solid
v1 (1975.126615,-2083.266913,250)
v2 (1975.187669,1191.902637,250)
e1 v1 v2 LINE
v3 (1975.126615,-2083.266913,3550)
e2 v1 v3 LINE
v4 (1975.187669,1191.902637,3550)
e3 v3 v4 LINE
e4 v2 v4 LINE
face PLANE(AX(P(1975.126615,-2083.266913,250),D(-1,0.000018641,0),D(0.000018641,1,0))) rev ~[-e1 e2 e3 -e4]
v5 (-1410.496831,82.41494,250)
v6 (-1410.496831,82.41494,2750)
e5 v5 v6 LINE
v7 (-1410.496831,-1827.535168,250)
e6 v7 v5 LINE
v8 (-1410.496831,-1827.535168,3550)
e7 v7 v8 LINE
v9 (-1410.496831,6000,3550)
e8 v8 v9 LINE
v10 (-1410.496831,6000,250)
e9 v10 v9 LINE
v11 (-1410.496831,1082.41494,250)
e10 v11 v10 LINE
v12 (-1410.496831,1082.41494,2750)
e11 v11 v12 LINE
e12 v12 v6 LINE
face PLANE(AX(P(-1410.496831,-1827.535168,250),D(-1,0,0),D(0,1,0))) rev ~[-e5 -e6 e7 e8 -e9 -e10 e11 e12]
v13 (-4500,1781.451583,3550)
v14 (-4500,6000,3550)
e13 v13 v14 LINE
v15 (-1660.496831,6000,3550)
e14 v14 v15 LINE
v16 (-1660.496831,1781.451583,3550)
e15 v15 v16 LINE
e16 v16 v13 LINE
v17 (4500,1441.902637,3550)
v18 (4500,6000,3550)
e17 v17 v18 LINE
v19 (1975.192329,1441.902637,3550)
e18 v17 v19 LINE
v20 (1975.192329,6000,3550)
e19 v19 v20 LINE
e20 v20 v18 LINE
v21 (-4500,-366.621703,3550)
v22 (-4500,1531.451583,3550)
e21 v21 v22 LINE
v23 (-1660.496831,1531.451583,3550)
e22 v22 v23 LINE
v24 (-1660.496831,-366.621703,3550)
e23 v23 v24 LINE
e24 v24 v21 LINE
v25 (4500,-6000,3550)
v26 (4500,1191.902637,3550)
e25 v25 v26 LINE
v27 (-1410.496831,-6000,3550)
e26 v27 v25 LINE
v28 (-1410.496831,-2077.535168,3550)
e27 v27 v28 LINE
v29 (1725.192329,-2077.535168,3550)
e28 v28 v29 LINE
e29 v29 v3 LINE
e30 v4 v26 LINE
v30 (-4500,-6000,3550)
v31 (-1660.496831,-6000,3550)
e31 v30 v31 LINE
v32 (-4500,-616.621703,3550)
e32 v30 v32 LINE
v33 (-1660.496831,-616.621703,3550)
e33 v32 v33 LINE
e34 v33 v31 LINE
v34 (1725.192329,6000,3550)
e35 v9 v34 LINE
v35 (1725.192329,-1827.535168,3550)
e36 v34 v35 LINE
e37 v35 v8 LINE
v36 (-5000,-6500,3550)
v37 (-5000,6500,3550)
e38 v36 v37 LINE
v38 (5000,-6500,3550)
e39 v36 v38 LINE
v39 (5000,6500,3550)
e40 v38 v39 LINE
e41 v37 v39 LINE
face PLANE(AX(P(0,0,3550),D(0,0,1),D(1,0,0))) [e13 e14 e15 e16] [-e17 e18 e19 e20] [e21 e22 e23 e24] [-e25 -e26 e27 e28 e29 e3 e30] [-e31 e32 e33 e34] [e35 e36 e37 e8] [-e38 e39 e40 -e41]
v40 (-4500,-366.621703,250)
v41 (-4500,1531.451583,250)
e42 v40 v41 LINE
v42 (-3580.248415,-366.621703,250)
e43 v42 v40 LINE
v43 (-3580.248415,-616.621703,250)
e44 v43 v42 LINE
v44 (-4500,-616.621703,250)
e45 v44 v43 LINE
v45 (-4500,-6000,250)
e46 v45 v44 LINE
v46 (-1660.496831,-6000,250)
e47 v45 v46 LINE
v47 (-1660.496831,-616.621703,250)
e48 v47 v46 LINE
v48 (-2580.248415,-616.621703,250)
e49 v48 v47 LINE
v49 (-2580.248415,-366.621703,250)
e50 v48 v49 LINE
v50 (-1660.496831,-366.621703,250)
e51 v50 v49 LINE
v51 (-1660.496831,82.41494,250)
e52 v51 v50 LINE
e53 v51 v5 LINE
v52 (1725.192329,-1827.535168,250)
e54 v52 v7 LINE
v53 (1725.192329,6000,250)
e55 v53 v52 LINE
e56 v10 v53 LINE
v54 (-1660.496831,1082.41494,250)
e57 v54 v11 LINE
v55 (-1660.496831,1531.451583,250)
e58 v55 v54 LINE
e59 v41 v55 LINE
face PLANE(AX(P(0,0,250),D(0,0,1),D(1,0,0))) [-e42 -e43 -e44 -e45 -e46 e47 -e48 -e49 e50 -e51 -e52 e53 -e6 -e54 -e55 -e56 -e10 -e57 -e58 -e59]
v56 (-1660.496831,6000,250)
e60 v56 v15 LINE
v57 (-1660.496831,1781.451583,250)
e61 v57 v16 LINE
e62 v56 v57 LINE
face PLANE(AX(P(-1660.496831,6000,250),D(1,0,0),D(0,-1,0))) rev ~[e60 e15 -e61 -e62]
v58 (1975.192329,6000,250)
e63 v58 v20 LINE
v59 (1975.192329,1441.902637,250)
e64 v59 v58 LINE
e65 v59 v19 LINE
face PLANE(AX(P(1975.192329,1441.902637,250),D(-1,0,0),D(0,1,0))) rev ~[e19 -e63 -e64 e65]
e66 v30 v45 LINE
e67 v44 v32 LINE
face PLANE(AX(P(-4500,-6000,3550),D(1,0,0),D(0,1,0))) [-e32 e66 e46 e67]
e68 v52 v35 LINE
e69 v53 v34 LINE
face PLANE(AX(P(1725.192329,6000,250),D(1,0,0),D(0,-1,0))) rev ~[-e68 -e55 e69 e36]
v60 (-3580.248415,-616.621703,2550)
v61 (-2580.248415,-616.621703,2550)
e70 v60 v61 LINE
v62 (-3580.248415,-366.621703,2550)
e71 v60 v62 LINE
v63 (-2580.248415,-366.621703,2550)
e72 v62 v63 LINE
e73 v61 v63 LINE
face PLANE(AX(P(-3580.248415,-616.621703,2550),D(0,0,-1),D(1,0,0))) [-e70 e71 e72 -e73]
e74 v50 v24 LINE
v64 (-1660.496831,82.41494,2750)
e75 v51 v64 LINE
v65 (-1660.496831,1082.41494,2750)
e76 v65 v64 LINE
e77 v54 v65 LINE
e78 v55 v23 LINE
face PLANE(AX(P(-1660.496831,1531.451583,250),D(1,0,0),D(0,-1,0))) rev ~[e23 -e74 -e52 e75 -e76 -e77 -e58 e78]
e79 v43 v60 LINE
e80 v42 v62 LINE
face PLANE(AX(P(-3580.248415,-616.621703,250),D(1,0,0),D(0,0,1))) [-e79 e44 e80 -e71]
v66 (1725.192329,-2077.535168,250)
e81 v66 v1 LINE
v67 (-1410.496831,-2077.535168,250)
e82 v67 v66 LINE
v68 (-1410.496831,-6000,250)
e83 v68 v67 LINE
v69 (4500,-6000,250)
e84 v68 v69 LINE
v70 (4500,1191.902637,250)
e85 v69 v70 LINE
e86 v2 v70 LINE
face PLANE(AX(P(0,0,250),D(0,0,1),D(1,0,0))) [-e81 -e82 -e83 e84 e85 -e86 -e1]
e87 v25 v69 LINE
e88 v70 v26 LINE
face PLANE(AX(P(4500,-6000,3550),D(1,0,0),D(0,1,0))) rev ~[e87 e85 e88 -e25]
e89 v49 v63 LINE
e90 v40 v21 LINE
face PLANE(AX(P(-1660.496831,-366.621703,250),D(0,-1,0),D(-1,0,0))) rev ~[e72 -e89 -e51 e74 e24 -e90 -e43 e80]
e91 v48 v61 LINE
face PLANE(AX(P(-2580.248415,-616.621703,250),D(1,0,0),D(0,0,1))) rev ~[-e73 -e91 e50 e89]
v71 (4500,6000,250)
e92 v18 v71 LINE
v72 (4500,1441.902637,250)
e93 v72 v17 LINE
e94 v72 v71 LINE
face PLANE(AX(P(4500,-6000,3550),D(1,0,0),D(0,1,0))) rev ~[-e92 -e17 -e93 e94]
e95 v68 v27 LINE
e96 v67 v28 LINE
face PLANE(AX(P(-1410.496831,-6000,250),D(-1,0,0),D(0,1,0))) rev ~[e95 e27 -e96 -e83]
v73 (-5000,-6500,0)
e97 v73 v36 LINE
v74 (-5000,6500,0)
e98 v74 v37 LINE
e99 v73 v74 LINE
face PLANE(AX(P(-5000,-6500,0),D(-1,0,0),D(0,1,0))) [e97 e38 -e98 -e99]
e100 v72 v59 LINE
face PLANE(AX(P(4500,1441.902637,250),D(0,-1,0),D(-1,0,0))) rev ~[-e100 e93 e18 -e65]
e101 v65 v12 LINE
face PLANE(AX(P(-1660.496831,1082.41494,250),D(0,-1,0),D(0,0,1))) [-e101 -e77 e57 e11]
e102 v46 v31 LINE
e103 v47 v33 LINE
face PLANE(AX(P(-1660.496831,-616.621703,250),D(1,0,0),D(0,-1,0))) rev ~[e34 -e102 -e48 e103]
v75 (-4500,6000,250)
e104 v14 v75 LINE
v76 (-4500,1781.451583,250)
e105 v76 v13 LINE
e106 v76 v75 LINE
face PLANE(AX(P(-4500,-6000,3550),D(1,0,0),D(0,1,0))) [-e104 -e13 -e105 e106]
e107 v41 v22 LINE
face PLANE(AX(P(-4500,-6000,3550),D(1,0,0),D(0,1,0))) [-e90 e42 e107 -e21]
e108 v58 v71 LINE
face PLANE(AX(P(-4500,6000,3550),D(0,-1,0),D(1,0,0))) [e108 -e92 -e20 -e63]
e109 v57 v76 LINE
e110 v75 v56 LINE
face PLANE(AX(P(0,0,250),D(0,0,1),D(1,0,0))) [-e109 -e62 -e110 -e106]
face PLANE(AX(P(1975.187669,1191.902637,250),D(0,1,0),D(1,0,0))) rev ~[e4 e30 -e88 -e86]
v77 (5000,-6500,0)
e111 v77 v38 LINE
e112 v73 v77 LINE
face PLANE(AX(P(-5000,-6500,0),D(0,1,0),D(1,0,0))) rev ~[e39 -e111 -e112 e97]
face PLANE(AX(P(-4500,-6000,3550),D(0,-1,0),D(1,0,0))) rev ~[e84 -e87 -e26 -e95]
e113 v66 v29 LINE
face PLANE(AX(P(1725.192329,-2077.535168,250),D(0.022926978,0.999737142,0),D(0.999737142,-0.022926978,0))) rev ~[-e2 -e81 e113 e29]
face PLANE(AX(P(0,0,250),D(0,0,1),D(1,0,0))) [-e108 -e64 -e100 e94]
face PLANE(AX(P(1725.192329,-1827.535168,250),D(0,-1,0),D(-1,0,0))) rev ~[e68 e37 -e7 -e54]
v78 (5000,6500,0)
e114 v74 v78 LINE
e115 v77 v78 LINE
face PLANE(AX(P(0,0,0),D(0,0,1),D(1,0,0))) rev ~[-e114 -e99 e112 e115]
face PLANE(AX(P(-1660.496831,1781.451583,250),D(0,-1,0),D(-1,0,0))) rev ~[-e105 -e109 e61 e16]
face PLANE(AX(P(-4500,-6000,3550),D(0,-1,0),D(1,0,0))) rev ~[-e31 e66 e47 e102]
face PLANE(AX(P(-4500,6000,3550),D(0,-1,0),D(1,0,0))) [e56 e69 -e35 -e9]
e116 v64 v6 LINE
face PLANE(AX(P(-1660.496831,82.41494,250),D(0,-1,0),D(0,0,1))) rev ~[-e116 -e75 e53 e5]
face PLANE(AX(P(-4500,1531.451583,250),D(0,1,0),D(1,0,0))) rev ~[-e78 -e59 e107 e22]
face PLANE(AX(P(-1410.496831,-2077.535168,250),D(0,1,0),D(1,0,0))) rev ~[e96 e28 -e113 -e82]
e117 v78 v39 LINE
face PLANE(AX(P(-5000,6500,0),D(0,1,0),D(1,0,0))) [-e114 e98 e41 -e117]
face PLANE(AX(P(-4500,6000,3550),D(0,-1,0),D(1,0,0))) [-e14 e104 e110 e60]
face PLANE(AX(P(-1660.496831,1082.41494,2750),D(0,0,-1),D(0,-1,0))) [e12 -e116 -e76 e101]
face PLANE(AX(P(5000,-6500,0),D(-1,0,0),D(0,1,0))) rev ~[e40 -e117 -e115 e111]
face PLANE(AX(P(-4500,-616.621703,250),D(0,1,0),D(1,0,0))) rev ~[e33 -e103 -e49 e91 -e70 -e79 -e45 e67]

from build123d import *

# Parameters (mm, degrees)
F0_W     = 10000
F0_H     = 13000
F1_DEPTH = 3550
F2_W     = 9000
F2_H     = 12000
F3_DEPTH = 3300
F5_DEPTH = 3300
F6_W     = 1000
F6_H     = 2300
F7_DEPTH = 250
F8_W     = 1000
F8_H     = 2500
F9_DEPTH = 250


# Not quite as in the source:
# - a feature names something its author has since deleted; it is built from what else it names


with BuildPart() as f1:
    # F0 (on Top) → F1 (new body)
    with BuildSketch(Plane.XY):
        Rectangle(F0_W, F0_H)
    extrude(amount=F1_DEPTH)

    # F2 (on face) → F3 (cut)
    with BuildSketch(Plane.XY.offset(3550)):
        Rectangle(F2_W, F2_H)
    extrude(amount=-F3_DEPTH, mode=Mode.SUBTRACT)

    # F4 (on face) → F5 (join)
    with BuildSketch(Plane.XY.offset(250)):
        Polygon((-1660.4968309402, -366.6217029095), (-4500, -366.6217029095), (-4500, -616.6217029095), (-1660.4968309402, -616.6217029095), (-1660.4968309402, -6000), (-1410.4968309402, -6000), (-1410.4968309402, -2077.5351682588), (1725.1923292822, -2077.5351682588), (1975.1266148544, -2083.2669128011), (1975.1876689086, 1191.9026374817), (4500, 1191.9026374817), (4500, 1441.9026374817), (1975.1923292822, 1441.9026374817), (1975.1923292822, 6000), (1725.1923292822, 6000), (1725.1923292822, 1441.9026374817), (1725.1923292822, -1827.5351682588), (-1410.4968309402, -1827.5351682588), (-1410.4968309402, 6000), (-1660.4968309402, 6000), (-1660.4968309402, 1781.4515829086), (-4500, 1781.4515829086), (-4500, 1531.4515829086), (-1660.4968309402, 1531.4515829086), align=None)
    extrude(amount=F5_DEPTH)

    # F6 (on face) → F7 (cut)
    with BuildSketch(Plane.XZ.offset(616.6217029095)):
        with Locations((-3080.2484154701, 1400)):
            Rectangle(F6_W, F6_H)
    extrude(amount=-F7_DEPTH, mode=Mode.SUBTRACT)

    # F8 (on face) → F9 (cut, through all)
    with BuildSketch(Plane(origin=(-1660.4968309402, 0, 0), x_dir=(0, -1, 0), z_dir=(-1, 0, 0))):
        with Locations((-582.4149399996, 1500)):
            Rectangle(F8_W, F8_H)
    extrude(amount=-F9_DEPTH, mode=Mode.SUBTRACT)


solid = f1.part
